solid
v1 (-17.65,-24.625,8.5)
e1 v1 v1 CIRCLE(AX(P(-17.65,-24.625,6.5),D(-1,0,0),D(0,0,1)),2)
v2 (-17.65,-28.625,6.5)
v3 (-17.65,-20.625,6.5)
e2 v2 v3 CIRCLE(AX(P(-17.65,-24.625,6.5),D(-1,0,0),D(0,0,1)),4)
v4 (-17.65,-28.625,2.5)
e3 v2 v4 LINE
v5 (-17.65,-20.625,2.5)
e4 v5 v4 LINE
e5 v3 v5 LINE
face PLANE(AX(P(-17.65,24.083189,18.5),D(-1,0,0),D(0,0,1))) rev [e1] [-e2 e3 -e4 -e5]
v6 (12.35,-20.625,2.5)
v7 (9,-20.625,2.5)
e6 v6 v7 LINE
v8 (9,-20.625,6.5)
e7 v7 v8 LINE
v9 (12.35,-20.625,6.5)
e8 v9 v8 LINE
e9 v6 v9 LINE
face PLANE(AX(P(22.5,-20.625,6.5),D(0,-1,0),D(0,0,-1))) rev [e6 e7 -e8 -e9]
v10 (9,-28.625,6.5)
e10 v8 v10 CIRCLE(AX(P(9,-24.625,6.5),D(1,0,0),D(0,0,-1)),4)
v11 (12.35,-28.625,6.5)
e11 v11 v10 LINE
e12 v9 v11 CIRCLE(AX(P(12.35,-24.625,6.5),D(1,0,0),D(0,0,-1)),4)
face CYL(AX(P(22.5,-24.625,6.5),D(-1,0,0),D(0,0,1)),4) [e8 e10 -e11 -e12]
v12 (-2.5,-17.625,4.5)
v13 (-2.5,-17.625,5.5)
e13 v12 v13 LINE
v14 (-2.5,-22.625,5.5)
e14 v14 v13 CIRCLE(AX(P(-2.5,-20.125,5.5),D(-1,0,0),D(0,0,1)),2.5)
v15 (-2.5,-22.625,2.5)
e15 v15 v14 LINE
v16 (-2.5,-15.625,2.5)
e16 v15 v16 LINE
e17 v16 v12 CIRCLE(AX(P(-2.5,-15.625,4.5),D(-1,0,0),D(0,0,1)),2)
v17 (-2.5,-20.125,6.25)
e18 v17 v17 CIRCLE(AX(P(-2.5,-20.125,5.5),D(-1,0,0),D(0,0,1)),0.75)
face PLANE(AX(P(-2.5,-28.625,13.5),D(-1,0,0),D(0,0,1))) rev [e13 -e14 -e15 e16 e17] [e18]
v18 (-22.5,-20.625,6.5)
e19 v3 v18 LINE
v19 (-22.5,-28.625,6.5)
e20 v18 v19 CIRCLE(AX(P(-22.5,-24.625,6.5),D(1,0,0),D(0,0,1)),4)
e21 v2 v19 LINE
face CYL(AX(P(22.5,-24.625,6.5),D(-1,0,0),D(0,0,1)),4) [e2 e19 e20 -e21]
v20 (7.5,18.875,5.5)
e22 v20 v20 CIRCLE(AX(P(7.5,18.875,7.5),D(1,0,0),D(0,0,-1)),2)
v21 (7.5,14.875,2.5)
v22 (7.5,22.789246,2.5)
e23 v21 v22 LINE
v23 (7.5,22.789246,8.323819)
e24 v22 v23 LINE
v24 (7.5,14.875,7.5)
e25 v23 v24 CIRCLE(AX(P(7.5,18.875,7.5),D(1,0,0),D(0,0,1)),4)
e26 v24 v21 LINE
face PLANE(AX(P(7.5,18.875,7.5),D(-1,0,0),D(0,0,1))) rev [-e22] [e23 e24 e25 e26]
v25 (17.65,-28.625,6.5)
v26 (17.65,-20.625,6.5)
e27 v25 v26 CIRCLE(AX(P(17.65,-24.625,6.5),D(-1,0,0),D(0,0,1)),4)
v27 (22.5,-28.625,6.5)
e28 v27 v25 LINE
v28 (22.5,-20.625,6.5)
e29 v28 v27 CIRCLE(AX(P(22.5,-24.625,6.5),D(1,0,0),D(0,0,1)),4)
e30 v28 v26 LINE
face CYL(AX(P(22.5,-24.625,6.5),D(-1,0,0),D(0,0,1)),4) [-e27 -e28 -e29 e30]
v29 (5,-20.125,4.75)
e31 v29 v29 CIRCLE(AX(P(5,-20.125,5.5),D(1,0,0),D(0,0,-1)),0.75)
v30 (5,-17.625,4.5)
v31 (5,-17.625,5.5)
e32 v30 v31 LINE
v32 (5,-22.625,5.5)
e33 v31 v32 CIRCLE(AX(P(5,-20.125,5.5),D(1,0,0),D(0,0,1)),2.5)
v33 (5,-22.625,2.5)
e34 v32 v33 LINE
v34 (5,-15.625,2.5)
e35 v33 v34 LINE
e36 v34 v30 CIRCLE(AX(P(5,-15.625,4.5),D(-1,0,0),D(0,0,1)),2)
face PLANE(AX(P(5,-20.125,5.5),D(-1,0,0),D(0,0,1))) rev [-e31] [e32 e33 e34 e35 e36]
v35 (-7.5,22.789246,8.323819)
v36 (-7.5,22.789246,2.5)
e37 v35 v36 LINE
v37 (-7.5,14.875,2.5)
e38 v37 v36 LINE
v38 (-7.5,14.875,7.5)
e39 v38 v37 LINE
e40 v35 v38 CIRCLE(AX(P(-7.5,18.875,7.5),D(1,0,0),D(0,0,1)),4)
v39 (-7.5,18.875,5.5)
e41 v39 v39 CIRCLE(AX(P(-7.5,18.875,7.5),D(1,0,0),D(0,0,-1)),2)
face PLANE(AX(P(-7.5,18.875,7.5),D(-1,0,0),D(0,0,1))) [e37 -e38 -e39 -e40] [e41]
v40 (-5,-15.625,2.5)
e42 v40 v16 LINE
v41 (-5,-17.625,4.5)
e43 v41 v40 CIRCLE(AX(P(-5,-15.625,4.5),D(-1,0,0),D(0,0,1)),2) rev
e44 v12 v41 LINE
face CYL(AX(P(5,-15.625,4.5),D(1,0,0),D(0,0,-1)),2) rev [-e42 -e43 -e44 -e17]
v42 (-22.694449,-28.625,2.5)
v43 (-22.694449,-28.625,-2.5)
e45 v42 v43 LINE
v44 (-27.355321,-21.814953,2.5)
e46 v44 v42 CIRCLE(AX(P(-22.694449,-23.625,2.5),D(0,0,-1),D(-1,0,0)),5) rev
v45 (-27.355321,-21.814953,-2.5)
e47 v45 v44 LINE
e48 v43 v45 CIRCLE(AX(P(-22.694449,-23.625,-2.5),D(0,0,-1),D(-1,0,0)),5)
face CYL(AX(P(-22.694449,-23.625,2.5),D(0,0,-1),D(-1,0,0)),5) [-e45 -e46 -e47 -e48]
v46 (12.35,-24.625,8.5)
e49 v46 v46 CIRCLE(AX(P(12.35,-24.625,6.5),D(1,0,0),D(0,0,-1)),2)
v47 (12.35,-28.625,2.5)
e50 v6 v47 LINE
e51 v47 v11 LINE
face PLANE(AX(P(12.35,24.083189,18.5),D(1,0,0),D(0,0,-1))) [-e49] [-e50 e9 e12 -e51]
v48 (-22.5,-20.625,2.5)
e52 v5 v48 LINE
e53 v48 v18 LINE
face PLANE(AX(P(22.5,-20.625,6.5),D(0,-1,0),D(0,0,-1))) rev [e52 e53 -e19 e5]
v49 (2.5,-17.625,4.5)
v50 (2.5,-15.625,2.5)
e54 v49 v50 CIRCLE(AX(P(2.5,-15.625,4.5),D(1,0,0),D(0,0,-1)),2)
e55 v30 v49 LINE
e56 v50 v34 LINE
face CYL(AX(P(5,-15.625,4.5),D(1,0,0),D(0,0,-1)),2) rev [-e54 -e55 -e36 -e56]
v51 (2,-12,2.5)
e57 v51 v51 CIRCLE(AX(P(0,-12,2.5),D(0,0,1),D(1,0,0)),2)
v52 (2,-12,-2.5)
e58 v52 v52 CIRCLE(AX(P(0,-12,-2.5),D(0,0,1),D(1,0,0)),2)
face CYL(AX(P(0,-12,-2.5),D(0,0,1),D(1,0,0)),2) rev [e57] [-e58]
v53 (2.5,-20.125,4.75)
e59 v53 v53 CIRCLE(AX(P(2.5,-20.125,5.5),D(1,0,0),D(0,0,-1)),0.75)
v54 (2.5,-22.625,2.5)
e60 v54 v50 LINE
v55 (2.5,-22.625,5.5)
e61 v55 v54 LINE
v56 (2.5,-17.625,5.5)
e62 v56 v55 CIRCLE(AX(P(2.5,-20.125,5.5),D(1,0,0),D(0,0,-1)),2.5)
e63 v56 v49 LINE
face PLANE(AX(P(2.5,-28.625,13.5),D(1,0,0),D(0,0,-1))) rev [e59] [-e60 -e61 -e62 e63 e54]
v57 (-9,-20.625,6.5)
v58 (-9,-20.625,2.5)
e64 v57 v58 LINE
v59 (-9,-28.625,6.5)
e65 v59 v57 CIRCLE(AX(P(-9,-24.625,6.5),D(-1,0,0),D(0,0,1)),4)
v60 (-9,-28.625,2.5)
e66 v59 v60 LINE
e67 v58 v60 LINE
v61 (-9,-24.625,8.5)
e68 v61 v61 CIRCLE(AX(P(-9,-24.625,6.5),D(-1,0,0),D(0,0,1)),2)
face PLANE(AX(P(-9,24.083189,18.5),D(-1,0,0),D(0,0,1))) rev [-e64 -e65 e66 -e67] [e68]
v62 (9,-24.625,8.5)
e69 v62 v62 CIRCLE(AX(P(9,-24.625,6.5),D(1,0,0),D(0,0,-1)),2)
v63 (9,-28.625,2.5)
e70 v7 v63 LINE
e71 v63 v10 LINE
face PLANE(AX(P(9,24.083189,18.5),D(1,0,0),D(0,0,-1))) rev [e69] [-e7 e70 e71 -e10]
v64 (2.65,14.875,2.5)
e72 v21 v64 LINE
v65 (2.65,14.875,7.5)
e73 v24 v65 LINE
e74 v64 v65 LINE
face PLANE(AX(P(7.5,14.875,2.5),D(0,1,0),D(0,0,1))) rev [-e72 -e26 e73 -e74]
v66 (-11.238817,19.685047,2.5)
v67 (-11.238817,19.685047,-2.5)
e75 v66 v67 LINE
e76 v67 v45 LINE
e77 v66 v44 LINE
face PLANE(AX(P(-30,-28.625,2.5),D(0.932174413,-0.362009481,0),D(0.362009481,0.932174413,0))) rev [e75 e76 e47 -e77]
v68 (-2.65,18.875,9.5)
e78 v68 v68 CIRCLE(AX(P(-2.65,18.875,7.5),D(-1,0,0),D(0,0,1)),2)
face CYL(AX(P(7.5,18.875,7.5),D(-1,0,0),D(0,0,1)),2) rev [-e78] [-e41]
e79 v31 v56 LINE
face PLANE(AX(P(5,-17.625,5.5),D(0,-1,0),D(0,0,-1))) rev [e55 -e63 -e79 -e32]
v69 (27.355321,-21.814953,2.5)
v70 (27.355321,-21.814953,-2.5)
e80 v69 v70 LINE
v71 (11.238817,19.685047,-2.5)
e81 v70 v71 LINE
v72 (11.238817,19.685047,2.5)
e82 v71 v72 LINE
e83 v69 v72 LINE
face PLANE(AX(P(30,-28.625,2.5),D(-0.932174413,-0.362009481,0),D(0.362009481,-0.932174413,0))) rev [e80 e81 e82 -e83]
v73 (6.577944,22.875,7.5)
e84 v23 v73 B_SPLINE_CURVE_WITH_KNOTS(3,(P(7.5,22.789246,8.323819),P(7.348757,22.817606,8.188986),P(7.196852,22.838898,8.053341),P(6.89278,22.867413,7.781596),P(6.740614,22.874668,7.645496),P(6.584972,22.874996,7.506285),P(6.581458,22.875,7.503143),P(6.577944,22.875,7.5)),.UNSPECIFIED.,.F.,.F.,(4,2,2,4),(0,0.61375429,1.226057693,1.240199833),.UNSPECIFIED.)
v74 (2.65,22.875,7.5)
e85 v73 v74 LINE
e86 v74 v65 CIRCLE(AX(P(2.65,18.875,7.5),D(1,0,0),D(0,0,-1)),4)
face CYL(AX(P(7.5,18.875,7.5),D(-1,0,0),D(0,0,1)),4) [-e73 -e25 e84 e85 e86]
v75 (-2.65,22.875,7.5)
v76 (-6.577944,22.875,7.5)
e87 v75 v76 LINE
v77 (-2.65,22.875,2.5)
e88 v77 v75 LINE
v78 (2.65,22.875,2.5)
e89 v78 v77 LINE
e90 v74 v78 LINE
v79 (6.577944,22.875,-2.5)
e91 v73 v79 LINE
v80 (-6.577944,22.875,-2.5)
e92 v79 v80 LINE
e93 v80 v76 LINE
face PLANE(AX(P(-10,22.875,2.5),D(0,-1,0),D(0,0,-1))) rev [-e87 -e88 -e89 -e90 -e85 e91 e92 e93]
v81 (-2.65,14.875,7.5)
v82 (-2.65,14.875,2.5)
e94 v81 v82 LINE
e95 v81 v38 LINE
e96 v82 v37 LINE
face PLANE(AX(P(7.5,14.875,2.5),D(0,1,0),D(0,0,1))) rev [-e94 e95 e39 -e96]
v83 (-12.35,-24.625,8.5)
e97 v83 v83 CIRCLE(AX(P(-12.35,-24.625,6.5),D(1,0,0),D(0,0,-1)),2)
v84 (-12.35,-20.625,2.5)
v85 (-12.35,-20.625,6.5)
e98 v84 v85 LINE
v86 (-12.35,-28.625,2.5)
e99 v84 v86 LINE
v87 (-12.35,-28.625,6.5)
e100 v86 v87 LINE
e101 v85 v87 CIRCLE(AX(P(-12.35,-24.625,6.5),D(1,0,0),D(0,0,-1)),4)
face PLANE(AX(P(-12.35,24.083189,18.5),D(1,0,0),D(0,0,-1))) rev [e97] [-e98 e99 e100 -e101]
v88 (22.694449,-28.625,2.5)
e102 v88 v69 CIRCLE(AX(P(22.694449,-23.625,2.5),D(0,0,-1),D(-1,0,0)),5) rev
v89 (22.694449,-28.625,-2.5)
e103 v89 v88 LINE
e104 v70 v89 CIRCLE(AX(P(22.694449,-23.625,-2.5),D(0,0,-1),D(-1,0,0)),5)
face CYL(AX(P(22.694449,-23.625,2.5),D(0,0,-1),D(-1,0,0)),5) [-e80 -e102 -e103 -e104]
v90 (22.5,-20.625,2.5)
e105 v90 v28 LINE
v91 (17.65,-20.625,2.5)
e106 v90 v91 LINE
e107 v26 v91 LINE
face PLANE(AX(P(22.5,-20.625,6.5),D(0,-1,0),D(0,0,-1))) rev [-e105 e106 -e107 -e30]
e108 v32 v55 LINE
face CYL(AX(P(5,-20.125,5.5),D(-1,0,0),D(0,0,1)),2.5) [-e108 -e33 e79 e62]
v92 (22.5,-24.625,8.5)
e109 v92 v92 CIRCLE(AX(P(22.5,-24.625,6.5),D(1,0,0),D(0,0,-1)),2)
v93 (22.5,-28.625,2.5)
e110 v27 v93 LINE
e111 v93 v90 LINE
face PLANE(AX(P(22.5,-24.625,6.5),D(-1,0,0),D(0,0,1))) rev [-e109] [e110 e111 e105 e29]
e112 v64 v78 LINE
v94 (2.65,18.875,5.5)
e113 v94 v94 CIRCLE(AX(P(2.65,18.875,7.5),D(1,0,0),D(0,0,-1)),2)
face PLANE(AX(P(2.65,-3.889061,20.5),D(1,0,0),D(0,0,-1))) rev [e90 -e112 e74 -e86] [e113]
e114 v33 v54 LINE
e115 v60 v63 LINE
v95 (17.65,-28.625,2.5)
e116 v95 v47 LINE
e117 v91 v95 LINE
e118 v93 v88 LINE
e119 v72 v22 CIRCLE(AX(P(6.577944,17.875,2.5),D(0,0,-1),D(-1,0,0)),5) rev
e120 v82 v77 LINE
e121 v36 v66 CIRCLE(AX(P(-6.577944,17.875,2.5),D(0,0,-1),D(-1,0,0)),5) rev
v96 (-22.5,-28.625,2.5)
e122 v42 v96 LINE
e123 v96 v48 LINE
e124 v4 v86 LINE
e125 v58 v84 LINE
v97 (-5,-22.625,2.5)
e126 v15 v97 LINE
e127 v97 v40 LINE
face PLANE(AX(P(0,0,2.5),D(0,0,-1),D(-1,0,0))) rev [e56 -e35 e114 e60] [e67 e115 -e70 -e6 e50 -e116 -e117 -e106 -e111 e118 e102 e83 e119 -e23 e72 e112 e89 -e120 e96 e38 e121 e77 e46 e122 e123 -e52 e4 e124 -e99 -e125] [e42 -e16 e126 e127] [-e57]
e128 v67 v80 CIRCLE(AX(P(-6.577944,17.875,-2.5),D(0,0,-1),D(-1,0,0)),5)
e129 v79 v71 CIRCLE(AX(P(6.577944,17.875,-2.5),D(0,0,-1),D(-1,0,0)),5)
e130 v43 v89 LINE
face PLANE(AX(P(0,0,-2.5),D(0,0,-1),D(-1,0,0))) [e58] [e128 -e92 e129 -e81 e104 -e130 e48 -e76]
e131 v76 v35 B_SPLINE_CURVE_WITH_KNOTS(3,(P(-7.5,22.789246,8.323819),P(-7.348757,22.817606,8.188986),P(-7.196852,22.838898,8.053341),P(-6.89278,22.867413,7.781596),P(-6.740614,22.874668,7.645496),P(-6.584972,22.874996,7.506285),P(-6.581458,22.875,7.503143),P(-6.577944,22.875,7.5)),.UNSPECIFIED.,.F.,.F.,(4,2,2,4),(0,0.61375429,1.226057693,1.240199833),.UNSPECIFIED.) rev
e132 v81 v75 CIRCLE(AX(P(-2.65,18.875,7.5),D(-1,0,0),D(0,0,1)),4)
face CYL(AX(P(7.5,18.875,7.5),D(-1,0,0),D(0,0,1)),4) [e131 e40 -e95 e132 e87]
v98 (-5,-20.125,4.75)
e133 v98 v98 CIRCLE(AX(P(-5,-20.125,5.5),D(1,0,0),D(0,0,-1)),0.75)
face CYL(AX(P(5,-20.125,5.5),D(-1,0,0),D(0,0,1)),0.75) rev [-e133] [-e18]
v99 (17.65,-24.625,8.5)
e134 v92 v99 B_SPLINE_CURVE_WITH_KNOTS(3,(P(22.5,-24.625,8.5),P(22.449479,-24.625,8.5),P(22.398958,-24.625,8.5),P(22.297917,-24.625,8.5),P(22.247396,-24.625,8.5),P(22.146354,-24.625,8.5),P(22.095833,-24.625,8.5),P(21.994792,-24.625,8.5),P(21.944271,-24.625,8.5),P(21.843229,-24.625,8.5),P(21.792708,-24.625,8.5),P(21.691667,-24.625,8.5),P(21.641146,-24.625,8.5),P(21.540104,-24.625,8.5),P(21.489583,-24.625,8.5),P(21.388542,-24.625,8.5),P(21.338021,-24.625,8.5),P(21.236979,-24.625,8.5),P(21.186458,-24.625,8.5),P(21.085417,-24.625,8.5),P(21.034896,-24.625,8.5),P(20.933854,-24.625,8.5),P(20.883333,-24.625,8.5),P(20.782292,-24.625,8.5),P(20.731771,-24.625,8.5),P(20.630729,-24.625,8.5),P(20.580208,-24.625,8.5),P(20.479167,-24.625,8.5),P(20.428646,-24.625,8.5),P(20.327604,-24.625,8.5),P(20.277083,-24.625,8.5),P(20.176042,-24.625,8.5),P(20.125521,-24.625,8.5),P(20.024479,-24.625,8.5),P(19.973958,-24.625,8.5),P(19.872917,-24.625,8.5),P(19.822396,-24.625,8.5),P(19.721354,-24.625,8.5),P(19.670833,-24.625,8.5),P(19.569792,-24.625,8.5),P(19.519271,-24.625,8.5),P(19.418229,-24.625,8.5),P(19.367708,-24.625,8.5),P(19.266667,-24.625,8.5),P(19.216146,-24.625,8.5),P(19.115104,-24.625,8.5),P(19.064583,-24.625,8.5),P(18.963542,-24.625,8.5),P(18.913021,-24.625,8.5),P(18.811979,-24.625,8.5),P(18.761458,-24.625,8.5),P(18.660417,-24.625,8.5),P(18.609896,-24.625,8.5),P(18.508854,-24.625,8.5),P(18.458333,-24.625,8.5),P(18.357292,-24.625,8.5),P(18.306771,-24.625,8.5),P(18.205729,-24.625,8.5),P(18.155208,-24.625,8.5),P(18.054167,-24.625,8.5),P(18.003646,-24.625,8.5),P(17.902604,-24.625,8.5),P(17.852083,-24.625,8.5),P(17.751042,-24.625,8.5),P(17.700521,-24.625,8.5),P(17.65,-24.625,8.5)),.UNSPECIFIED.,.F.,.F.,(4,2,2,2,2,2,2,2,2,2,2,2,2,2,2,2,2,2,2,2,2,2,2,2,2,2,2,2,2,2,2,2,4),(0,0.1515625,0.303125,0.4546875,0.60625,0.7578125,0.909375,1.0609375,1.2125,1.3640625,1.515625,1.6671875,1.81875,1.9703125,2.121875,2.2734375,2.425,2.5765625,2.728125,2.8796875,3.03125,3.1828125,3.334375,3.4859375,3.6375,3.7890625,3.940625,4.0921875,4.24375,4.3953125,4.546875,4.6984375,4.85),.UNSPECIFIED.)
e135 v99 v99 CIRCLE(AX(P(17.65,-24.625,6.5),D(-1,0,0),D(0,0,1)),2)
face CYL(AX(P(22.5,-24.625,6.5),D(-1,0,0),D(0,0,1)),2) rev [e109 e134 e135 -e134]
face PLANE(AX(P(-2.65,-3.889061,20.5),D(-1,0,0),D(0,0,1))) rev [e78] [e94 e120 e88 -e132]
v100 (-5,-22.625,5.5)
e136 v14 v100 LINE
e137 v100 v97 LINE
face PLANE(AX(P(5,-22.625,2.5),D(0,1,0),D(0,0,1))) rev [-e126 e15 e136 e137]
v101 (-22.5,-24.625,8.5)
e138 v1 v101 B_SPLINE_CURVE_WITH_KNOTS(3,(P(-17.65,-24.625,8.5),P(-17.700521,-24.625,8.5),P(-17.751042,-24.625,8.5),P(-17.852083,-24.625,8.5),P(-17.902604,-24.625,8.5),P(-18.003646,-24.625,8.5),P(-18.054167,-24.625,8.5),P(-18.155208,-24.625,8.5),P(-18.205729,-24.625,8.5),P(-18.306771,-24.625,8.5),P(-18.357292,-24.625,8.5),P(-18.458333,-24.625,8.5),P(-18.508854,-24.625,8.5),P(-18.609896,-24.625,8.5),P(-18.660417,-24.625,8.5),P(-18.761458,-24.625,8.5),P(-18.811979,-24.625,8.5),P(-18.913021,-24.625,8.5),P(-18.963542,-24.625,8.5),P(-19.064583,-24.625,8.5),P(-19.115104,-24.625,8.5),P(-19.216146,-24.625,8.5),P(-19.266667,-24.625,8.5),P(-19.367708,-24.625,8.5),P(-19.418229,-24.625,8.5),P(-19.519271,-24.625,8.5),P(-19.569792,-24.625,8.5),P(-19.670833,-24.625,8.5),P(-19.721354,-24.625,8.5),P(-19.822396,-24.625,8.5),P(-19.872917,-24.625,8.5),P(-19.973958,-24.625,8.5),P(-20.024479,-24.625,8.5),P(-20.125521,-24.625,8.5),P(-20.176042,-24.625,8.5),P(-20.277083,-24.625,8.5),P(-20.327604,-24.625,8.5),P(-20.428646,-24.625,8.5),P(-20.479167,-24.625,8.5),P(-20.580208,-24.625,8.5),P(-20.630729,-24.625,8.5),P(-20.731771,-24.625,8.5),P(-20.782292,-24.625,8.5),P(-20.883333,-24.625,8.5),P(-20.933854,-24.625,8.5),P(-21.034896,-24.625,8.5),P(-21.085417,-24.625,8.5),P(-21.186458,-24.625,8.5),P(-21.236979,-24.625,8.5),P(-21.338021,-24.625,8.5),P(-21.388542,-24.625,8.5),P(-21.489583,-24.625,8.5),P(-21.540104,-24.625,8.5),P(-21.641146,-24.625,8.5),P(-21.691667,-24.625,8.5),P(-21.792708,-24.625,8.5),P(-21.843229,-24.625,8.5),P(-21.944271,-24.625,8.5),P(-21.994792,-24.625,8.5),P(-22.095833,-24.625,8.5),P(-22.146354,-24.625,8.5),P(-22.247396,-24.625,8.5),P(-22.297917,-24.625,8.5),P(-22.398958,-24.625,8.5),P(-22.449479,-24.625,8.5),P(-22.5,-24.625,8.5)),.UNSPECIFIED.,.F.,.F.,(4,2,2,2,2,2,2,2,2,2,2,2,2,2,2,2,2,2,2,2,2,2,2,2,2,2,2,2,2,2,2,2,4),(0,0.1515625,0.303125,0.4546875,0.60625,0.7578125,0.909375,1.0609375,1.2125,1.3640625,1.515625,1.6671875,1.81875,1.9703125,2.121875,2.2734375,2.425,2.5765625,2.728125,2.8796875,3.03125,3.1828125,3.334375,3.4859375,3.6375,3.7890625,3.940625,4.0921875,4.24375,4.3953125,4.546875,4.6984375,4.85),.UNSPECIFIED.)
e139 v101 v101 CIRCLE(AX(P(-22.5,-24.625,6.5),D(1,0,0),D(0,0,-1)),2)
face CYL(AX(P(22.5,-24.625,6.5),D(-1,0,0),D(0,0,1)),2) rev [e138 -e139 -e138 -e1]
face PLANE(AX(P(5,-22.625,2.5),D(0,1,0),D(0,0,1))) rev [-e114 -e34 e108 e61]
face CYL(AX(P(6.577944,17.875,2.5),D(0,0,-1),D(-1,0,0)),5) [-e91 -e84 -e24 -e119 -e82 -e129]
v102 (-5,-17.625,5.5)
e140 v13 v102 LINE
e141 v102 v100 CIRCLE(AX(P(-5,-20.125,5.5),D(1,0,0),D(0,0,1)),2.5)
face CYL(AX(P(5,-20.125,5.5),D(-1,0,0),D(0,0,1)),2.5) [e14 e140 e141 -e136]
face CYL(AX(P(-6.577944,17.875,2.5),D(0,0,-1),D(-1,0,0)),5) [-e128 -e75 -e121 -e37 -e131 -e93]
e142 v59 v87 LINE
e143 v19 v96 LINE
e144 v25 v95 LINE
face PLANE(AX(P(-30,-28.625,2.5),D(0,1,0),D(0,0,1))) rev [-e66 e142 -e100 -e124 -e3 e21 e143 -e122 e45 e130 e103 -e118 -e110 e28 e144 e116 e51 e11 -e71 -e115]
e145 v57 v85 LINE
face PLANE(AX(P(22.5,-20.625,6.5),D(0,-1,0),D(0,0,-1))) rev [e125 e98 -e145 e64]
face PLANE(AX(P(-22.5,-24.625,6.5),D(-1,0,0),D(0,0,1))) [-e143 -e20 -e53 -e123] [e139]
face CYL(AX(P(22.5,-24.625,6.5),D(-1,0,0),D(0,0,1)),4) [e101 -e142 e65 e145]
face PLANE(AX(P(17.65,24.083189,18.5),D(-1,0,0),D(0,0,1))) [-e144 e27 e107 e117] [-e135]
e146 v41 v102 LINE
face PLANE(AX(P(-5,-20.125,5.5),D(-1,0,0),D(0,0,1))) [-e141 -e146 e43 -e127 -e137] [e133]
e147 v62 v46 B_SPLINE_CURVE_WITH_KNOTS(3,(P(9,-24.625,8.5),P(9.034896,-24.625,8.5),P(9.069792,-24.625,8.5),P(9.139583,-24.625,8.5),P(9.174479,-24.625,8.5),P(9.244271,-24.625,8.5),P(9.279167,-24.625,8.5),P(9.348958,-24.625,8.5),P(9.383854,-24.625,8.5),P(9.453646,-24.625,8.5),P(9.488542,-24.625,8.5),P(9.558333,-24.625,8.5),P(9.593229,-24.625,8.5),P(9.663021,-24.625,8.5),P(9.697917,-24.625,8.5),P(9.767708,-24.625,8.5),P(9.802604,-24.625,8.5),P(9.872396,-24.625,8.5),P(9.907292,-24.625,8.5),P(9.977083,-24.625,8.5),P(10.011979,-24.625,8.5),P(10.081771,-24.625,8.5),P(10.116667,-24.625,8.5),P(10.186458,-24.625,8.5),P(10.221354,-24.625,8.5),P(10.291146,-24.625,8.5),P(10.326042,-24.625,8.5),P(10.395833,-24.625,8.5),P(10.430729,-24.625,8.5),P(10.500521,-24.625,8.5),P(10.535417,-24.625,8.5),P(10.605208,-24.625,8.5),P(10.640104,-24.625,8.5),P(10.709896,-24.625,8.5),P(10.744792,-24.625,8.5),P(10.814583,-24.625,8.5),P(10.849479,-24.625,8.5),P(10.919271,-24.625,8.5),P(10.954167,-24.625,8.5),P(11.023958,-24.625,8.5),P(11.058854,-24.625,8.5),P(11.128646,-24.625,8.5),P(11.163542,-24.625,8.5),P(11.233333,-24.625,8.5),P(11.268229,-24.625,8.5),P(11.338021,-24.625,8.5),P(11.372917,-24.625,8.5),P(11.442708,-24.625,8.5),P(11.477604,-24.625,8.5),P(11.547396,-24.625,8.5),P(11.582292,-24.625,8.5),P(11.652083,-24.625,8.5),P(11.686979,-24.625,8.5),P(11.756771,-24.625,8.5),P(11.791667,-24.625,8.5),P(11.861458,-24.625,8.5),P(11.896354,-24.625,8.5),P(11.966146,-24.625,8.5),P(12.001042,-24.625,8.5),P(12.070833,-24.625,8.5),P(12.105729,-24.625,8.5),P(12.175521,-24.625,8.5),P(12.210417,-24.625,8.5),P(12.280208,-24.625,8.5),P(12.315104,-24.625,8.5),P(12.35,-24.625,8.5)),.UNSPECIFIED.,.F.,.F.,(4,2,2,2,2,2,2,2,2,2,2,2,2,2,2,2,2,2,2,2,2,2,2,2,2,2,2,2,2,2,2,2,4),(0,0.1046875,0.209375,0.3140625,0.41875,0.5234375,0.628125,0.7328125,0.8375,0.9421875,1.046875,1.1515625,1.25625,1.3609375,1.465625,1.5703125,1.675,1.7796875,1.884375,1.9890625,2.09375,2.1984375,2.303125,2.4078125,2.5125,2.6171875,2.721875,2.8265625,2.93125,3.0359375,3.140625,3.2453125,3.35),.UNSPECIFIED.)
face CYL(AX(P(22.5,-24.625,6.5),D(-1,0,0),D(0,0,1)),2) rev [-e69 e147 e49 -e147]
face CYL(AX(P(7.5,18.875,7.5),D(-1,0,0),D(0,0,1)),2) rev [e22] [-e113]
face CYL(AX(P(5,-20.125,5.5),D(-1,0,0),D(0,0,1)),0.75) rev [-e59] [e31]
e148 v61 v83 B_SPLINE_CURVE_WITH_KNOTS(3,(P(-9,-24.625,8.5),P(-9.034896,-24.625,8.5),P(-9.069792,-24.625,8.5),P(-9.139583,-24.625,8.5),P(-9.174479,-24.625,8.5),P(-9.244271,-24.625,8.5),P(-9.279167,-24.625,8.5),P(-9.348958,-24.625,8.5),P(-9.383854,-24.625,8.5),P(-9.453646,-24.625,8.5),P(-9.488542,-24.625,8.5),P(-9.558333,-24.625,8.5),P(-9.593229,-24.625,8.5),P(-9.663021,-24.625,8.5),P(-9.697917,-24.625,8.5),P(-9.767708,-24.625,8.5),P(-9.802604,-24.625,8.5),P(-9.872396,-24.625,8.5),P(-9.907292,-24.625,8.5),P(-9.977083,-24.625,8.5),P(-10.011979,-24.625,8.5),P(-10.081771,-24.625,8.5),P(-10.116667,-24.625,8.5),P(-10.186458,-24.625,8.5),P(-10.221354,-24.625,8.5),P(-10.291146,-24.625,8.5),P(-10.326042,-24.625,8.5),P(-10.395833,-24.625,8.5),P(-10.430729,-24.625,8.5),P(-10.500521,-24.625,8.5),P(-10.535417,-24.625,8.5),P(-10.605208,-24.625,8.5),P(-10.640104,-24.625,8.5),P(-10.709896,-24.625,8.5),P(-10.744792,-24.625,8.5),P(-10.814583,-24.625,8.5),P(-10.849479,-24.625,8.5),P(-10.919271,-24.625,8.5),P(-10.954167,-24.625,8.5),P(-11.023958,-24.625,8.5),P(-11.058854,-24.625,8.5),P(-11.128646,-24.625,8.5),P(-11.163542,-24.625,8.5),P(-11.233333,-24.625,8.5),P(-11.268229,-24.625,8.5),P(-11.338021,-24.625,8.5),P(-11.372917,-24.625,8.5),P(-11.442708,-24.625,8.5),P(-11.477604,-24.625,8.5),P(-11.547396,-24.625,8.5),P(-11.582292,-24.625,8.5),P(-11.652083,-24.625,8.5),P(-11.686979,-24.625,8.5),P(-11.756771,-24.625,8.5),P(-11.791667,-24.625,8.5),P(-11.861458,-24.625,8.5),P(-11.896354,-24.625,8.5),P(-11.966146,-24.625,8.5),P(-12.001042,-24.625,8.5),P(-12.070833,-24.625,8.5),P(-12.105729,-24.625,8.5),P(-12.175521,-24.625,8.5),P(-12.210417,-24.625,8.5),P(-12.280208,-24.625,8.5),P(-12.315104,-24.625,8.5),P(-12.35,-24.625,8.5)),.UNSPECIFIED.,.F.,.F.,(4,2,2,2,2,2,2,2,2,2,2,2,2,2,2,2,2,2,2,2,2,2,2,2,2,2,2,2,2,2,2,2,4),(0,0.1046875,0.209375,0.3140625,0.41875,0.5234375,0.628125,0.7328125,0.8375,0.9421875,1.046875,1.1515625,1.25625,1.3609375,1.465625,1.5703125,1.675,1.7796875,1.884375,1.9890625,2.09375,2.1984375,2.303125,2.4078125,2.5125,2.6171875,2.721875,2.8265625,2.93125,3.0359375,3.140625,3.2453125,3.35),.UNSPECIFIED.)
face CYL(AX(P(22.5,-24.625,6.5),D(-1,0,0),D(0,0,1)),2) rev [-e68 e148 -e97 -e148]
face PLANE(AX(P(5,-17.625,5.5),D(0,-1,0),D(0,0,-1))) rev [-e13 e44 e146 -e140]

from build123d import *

# Parameters (mm, degrees)
BOSS_EXTRUDE1_DEPTH = 2.5
SKETCH2_R           = 2
BOSS_EXTRUDE2_DEPTH = 22.5
CUT_EXTRUDE1_REACH  = 62.519
SKETCH3_W           = 18
SKETCH3_H           = 16
SKETCH3_W_2         = 5.3
SKETCH7_R           = 2
BOSS_EXTRUDE4_DEPTH = 7.5
SKETCH8_W           = 5.3
SKETCH8_H           = 18
CUT_EXTRUDE4_DEPTH  = 8
SKETCH4_R           = 0.75
BOSS_EXTRUDE3_DEPTH = 5
SKETCH5_W           = 5
SKETCH5_H           = 11
CUT_EXTRUDE2_DEPTH  = 52.696228102
FILLET2_R           = 2
SKETCH6_R           = 2
CUT_EXTRUDE3_DEPTH  = 43.431010181
FILLET4_R           = 5


with BuildPart() as part:
    # Sketch1 → Boss-Extrude1 (new, symmetric)
    with BuildSketch(Plane.XY):
        Polygon((-30, -28.625), (30, -28.625), (10, 22.875), (-10, 22.875), align=None)
    extrude(amount=BOSS_EXTRUDE1_DEPTH, both=True)

    # Sketch2 → Boss-Extrude2 (add, symmetric)
    with BuildSketch(Plane(origin=(0, 0, 0), x_dir=(0, 0, -1), z_dir=(1, 0, 0))):
        with BuildLine():
            Line((-2.5, -28.625), (-6.5, -28.625))
            ThreePointArc((-6.5, -28.625), (-10.5, -24.625), (-6.5, -20.625))
            Line((-6.5, -20.625), (-2.5, -20.625))
            Line((-2.5, -20.625), (-2.5, -28.625))
        make_face()
        with Locations(Location((-6.5, -24.625, 0), (0, 0, 180))):
            Circle(SKETCH2_R, mode=Mode.SUBTRACT)
    extrude(amount=BOSS_EXTRUDE2_DEPTH, both=True)

    # Sketch3 → Cut-Extrude1 (cut, up to next)
    with BuildSketch(Plane.XZ.offset(28.625), mode=Mode.PRIVATE) as cut_extrude1_sk1:
        with Locations((0, 10.5)):
            Rectangle(SKETCH3_W, SKETCH3_H)
    cut_extrude1_tool1 = extrude(cut_extrude1_sk1.sketch, amount=-CUT_EXTRUDE1_REACH, mode=Mode.PRIVATE) & part.part
    # Sketch3 → Cut-Extrude1 (cut, up to next)
    with BuildSketch(Plane.XZ.offset(28.625), mode=Mode.PRIVATE) as cut_extrude1_sk2:
        with Locations((-15, 10.5)):
            Rectangle(SKETCH3_W_2, SKETCH3_H)
    cut_extrude1_tool2 = extrude(cut_extrude1_sk2.sketch, amount=-CUT_EXTRUDE1_REACH, mode=Mode.PRIVATE) & part.part
    cut_extrude1_1 = cut_extrude1_tool1.solids().sort_by_distance((0, -28.625, 10.5))[0]
    add(cut_extrude1_1, mode=Mode.SUBTRACT)
    cut_extrude1_2 = cut_extrude1_tool2.solids().sort_by_distance((-15, -28.625, 10.5))[0]
    add(cut_extrude1_2, mode=Mode.SUBTRACT)
    cut_extrude1 = cut_extrude1_1 + cut_extrude1_2  # Cut-Extrude1 as one shape, for the pattern or mirror that repeats it

    # Mirror2: Cut-Extrude1 across plane
    add(cut_extrude1.mirror(Plane(origin=(0, 0, 0), x_dir=(0, 0, 1), z_dir=(1, 0, 0))), mode=Mode.SUBTRACT)

    # Sketch7 → Boss-Extrude4 (add, symmetric)
    with BuildSketch(Plane(origin=(0, 0, 0), x_dir=(0, 0, -1), z_dir=(1, 0, 0))):
        with BuildLine():
            Line((-2.5, 14.875), (-7.5, 14.875))
            ThreePointArc((-7.5, 14.875), (-11.5, 18.875), (-7.5, 22.875))
            Line((-7.5, 22.875), (-2.5, 22.875))
            Line((-2.5, 22.875), (-2.5, 14.875))
        make_face()
        with Locations((-7.5, 18.875)):
            Circle(SKETCH7_R, mode=Mode.SUBTRACT)
    extrude(amount=BOSS_EXTRUDE4_DEPTH, both=True)

    # Sketch8 → Cut-Extrude4 (cut)
    with BuildSketch(Plane(origin=(0, 22.875, 0), x_dir=(1, 0, 0), z_dir=(0, 1, 0))):
        with Locations((0, -11.5)):
            Rectangle(SKETCH8_W, SKETCH8_H)
    extrude(amount=-CUT_EXTRUDE4_DEPTH, mode=Mode.SUBTRACT)

    # Sketch4 → Boss-Extrude3 (add, symmetric)
    with BuildSketch(Plane(origin=(0, 0, 0), x_dir=(0, 0, -1), z_dir=(1, 0, 0))):
        with BuildLine():
            Line((-2.5, -22.625), (-5.5, -22.625))
            ThreePointArc((-5.5, -22.625), (-8, -20.125), (-5.5, -17.625))
            Line((-5.5, -17.625), (-2.5, -17.625))
            Line((-2.5, -17.625), (-2.5, -22.625))
        make_face()
        with Locations((-5.5, -20.125)):
            Circle(SKETCH4_R, mode=Mode.SUBTRACT)
    extrude(amount=BOSS_EXTRUDE3_DEPTH, both=True)

    # Sketch5 → Cut-Extrude2 (cut, through all)
    with BuildSketch(Plane(origin=(0, -17.625, 0), x_dir=(1, 0, 0), z_dir=(0, 1, 0))):
        with Locations((0, -8)):
            Rectangle(SKETCH5_W, SKETCH5_H)
    extrude(amount=-CUT_EXTRUDE2_DEPTH, mode=Mode.SUBTRACT)

    # Fillet2
    fillet2_edges = [part.edges().sort_by_distance(p)[0] for p in [
        (3.75, -17.625, 2.5),
        (-3.75, -17.625, 2.5),
    ]]
    fillet(fillet2_edges, radius=FILLET2_R)

    # Sketch6 → Cut-Extrude3 (cut, through all)
    with BuildSketch(Plane.XY.offset(2.5)):
        with Locations((0, -12)):
            Circle(SKETCH6_R)
    extrude(amount=-CUT_EXTRUDE3_DEPTH, mode=Mode.SUBTRACT)

    # Fillet4
    # the kernel refuses this fillet: 5 mm, written as the material it takes off along each edge
    with BuildSketch(Plane(origin=(30, -28.625, -20.763876668), x_dir=(-1, 0, 0), z_dir=(0, 0, 1)), Plane(origin=(-30, -28.625, 20.763876668), x_dir=(1, 0, 0), z_dir=(0, 0, -1))) as fillet4_piece_1:
        with BuildLine():
            CenterArc((FILLET4_R * 1.46111013346, -FILLET4_R), FILLET4_R, 90, 111.223656503)
            Line((FILLET4_R * 0.52893572066, -FILLET4_R * 1.3620094807), (0, 0))
            Line((0, 0), (FILLET4_R * 1.46111013346, 0))
        make_face()
    extrude(amount=41.527753337, mode=Mode.SUBTRACT)
    with BuildSketch(Plane(origin=(10, 22.875, -11.055138804), x_dir=(0.3620094806999332, -0.9321744128023278, 0), z_dir=(0, 0, 1))) as fillet4_piece_2:
        with BuildLine():
            CenterArc((FILLET4_R * 0.684411104336, -FILLET4_R), FILLET4_R, 90, 68.776343497)
            Line((-FILLET4_R * 0.247763308466, -FILLET4_R * 0.6379905193), (0, 0))
            Line((0, 0), (FILLET4_R * 0.684411104336, 0))
        make_face()
    extrude(amount=22.110277608, mode=Mode.SUBTRACT)
    with BuildSketch(Plane(origin=(-10, 22.875, 11.055138804), x_dir=(1, 0, 0), z_dir=(0, 0, -1))) as fillet4_piece_3:
        with BuildLine():
            CenterArc((FILLET4_R * 0.684411104336, FILLET4_R), FILLET4_R, 201.223656503, 68.776343497)
            Line((-FILLET4_R * 0.247763308466, FILLET4_R * 0.6379905193), (0, 0))
            Line((0, 0), (FILLET4_R * 0.684411104336, 0))
        make_face()
    extrude(amount=22.110277608, mode=Mode.SUBTRACT)


solid = part.part
